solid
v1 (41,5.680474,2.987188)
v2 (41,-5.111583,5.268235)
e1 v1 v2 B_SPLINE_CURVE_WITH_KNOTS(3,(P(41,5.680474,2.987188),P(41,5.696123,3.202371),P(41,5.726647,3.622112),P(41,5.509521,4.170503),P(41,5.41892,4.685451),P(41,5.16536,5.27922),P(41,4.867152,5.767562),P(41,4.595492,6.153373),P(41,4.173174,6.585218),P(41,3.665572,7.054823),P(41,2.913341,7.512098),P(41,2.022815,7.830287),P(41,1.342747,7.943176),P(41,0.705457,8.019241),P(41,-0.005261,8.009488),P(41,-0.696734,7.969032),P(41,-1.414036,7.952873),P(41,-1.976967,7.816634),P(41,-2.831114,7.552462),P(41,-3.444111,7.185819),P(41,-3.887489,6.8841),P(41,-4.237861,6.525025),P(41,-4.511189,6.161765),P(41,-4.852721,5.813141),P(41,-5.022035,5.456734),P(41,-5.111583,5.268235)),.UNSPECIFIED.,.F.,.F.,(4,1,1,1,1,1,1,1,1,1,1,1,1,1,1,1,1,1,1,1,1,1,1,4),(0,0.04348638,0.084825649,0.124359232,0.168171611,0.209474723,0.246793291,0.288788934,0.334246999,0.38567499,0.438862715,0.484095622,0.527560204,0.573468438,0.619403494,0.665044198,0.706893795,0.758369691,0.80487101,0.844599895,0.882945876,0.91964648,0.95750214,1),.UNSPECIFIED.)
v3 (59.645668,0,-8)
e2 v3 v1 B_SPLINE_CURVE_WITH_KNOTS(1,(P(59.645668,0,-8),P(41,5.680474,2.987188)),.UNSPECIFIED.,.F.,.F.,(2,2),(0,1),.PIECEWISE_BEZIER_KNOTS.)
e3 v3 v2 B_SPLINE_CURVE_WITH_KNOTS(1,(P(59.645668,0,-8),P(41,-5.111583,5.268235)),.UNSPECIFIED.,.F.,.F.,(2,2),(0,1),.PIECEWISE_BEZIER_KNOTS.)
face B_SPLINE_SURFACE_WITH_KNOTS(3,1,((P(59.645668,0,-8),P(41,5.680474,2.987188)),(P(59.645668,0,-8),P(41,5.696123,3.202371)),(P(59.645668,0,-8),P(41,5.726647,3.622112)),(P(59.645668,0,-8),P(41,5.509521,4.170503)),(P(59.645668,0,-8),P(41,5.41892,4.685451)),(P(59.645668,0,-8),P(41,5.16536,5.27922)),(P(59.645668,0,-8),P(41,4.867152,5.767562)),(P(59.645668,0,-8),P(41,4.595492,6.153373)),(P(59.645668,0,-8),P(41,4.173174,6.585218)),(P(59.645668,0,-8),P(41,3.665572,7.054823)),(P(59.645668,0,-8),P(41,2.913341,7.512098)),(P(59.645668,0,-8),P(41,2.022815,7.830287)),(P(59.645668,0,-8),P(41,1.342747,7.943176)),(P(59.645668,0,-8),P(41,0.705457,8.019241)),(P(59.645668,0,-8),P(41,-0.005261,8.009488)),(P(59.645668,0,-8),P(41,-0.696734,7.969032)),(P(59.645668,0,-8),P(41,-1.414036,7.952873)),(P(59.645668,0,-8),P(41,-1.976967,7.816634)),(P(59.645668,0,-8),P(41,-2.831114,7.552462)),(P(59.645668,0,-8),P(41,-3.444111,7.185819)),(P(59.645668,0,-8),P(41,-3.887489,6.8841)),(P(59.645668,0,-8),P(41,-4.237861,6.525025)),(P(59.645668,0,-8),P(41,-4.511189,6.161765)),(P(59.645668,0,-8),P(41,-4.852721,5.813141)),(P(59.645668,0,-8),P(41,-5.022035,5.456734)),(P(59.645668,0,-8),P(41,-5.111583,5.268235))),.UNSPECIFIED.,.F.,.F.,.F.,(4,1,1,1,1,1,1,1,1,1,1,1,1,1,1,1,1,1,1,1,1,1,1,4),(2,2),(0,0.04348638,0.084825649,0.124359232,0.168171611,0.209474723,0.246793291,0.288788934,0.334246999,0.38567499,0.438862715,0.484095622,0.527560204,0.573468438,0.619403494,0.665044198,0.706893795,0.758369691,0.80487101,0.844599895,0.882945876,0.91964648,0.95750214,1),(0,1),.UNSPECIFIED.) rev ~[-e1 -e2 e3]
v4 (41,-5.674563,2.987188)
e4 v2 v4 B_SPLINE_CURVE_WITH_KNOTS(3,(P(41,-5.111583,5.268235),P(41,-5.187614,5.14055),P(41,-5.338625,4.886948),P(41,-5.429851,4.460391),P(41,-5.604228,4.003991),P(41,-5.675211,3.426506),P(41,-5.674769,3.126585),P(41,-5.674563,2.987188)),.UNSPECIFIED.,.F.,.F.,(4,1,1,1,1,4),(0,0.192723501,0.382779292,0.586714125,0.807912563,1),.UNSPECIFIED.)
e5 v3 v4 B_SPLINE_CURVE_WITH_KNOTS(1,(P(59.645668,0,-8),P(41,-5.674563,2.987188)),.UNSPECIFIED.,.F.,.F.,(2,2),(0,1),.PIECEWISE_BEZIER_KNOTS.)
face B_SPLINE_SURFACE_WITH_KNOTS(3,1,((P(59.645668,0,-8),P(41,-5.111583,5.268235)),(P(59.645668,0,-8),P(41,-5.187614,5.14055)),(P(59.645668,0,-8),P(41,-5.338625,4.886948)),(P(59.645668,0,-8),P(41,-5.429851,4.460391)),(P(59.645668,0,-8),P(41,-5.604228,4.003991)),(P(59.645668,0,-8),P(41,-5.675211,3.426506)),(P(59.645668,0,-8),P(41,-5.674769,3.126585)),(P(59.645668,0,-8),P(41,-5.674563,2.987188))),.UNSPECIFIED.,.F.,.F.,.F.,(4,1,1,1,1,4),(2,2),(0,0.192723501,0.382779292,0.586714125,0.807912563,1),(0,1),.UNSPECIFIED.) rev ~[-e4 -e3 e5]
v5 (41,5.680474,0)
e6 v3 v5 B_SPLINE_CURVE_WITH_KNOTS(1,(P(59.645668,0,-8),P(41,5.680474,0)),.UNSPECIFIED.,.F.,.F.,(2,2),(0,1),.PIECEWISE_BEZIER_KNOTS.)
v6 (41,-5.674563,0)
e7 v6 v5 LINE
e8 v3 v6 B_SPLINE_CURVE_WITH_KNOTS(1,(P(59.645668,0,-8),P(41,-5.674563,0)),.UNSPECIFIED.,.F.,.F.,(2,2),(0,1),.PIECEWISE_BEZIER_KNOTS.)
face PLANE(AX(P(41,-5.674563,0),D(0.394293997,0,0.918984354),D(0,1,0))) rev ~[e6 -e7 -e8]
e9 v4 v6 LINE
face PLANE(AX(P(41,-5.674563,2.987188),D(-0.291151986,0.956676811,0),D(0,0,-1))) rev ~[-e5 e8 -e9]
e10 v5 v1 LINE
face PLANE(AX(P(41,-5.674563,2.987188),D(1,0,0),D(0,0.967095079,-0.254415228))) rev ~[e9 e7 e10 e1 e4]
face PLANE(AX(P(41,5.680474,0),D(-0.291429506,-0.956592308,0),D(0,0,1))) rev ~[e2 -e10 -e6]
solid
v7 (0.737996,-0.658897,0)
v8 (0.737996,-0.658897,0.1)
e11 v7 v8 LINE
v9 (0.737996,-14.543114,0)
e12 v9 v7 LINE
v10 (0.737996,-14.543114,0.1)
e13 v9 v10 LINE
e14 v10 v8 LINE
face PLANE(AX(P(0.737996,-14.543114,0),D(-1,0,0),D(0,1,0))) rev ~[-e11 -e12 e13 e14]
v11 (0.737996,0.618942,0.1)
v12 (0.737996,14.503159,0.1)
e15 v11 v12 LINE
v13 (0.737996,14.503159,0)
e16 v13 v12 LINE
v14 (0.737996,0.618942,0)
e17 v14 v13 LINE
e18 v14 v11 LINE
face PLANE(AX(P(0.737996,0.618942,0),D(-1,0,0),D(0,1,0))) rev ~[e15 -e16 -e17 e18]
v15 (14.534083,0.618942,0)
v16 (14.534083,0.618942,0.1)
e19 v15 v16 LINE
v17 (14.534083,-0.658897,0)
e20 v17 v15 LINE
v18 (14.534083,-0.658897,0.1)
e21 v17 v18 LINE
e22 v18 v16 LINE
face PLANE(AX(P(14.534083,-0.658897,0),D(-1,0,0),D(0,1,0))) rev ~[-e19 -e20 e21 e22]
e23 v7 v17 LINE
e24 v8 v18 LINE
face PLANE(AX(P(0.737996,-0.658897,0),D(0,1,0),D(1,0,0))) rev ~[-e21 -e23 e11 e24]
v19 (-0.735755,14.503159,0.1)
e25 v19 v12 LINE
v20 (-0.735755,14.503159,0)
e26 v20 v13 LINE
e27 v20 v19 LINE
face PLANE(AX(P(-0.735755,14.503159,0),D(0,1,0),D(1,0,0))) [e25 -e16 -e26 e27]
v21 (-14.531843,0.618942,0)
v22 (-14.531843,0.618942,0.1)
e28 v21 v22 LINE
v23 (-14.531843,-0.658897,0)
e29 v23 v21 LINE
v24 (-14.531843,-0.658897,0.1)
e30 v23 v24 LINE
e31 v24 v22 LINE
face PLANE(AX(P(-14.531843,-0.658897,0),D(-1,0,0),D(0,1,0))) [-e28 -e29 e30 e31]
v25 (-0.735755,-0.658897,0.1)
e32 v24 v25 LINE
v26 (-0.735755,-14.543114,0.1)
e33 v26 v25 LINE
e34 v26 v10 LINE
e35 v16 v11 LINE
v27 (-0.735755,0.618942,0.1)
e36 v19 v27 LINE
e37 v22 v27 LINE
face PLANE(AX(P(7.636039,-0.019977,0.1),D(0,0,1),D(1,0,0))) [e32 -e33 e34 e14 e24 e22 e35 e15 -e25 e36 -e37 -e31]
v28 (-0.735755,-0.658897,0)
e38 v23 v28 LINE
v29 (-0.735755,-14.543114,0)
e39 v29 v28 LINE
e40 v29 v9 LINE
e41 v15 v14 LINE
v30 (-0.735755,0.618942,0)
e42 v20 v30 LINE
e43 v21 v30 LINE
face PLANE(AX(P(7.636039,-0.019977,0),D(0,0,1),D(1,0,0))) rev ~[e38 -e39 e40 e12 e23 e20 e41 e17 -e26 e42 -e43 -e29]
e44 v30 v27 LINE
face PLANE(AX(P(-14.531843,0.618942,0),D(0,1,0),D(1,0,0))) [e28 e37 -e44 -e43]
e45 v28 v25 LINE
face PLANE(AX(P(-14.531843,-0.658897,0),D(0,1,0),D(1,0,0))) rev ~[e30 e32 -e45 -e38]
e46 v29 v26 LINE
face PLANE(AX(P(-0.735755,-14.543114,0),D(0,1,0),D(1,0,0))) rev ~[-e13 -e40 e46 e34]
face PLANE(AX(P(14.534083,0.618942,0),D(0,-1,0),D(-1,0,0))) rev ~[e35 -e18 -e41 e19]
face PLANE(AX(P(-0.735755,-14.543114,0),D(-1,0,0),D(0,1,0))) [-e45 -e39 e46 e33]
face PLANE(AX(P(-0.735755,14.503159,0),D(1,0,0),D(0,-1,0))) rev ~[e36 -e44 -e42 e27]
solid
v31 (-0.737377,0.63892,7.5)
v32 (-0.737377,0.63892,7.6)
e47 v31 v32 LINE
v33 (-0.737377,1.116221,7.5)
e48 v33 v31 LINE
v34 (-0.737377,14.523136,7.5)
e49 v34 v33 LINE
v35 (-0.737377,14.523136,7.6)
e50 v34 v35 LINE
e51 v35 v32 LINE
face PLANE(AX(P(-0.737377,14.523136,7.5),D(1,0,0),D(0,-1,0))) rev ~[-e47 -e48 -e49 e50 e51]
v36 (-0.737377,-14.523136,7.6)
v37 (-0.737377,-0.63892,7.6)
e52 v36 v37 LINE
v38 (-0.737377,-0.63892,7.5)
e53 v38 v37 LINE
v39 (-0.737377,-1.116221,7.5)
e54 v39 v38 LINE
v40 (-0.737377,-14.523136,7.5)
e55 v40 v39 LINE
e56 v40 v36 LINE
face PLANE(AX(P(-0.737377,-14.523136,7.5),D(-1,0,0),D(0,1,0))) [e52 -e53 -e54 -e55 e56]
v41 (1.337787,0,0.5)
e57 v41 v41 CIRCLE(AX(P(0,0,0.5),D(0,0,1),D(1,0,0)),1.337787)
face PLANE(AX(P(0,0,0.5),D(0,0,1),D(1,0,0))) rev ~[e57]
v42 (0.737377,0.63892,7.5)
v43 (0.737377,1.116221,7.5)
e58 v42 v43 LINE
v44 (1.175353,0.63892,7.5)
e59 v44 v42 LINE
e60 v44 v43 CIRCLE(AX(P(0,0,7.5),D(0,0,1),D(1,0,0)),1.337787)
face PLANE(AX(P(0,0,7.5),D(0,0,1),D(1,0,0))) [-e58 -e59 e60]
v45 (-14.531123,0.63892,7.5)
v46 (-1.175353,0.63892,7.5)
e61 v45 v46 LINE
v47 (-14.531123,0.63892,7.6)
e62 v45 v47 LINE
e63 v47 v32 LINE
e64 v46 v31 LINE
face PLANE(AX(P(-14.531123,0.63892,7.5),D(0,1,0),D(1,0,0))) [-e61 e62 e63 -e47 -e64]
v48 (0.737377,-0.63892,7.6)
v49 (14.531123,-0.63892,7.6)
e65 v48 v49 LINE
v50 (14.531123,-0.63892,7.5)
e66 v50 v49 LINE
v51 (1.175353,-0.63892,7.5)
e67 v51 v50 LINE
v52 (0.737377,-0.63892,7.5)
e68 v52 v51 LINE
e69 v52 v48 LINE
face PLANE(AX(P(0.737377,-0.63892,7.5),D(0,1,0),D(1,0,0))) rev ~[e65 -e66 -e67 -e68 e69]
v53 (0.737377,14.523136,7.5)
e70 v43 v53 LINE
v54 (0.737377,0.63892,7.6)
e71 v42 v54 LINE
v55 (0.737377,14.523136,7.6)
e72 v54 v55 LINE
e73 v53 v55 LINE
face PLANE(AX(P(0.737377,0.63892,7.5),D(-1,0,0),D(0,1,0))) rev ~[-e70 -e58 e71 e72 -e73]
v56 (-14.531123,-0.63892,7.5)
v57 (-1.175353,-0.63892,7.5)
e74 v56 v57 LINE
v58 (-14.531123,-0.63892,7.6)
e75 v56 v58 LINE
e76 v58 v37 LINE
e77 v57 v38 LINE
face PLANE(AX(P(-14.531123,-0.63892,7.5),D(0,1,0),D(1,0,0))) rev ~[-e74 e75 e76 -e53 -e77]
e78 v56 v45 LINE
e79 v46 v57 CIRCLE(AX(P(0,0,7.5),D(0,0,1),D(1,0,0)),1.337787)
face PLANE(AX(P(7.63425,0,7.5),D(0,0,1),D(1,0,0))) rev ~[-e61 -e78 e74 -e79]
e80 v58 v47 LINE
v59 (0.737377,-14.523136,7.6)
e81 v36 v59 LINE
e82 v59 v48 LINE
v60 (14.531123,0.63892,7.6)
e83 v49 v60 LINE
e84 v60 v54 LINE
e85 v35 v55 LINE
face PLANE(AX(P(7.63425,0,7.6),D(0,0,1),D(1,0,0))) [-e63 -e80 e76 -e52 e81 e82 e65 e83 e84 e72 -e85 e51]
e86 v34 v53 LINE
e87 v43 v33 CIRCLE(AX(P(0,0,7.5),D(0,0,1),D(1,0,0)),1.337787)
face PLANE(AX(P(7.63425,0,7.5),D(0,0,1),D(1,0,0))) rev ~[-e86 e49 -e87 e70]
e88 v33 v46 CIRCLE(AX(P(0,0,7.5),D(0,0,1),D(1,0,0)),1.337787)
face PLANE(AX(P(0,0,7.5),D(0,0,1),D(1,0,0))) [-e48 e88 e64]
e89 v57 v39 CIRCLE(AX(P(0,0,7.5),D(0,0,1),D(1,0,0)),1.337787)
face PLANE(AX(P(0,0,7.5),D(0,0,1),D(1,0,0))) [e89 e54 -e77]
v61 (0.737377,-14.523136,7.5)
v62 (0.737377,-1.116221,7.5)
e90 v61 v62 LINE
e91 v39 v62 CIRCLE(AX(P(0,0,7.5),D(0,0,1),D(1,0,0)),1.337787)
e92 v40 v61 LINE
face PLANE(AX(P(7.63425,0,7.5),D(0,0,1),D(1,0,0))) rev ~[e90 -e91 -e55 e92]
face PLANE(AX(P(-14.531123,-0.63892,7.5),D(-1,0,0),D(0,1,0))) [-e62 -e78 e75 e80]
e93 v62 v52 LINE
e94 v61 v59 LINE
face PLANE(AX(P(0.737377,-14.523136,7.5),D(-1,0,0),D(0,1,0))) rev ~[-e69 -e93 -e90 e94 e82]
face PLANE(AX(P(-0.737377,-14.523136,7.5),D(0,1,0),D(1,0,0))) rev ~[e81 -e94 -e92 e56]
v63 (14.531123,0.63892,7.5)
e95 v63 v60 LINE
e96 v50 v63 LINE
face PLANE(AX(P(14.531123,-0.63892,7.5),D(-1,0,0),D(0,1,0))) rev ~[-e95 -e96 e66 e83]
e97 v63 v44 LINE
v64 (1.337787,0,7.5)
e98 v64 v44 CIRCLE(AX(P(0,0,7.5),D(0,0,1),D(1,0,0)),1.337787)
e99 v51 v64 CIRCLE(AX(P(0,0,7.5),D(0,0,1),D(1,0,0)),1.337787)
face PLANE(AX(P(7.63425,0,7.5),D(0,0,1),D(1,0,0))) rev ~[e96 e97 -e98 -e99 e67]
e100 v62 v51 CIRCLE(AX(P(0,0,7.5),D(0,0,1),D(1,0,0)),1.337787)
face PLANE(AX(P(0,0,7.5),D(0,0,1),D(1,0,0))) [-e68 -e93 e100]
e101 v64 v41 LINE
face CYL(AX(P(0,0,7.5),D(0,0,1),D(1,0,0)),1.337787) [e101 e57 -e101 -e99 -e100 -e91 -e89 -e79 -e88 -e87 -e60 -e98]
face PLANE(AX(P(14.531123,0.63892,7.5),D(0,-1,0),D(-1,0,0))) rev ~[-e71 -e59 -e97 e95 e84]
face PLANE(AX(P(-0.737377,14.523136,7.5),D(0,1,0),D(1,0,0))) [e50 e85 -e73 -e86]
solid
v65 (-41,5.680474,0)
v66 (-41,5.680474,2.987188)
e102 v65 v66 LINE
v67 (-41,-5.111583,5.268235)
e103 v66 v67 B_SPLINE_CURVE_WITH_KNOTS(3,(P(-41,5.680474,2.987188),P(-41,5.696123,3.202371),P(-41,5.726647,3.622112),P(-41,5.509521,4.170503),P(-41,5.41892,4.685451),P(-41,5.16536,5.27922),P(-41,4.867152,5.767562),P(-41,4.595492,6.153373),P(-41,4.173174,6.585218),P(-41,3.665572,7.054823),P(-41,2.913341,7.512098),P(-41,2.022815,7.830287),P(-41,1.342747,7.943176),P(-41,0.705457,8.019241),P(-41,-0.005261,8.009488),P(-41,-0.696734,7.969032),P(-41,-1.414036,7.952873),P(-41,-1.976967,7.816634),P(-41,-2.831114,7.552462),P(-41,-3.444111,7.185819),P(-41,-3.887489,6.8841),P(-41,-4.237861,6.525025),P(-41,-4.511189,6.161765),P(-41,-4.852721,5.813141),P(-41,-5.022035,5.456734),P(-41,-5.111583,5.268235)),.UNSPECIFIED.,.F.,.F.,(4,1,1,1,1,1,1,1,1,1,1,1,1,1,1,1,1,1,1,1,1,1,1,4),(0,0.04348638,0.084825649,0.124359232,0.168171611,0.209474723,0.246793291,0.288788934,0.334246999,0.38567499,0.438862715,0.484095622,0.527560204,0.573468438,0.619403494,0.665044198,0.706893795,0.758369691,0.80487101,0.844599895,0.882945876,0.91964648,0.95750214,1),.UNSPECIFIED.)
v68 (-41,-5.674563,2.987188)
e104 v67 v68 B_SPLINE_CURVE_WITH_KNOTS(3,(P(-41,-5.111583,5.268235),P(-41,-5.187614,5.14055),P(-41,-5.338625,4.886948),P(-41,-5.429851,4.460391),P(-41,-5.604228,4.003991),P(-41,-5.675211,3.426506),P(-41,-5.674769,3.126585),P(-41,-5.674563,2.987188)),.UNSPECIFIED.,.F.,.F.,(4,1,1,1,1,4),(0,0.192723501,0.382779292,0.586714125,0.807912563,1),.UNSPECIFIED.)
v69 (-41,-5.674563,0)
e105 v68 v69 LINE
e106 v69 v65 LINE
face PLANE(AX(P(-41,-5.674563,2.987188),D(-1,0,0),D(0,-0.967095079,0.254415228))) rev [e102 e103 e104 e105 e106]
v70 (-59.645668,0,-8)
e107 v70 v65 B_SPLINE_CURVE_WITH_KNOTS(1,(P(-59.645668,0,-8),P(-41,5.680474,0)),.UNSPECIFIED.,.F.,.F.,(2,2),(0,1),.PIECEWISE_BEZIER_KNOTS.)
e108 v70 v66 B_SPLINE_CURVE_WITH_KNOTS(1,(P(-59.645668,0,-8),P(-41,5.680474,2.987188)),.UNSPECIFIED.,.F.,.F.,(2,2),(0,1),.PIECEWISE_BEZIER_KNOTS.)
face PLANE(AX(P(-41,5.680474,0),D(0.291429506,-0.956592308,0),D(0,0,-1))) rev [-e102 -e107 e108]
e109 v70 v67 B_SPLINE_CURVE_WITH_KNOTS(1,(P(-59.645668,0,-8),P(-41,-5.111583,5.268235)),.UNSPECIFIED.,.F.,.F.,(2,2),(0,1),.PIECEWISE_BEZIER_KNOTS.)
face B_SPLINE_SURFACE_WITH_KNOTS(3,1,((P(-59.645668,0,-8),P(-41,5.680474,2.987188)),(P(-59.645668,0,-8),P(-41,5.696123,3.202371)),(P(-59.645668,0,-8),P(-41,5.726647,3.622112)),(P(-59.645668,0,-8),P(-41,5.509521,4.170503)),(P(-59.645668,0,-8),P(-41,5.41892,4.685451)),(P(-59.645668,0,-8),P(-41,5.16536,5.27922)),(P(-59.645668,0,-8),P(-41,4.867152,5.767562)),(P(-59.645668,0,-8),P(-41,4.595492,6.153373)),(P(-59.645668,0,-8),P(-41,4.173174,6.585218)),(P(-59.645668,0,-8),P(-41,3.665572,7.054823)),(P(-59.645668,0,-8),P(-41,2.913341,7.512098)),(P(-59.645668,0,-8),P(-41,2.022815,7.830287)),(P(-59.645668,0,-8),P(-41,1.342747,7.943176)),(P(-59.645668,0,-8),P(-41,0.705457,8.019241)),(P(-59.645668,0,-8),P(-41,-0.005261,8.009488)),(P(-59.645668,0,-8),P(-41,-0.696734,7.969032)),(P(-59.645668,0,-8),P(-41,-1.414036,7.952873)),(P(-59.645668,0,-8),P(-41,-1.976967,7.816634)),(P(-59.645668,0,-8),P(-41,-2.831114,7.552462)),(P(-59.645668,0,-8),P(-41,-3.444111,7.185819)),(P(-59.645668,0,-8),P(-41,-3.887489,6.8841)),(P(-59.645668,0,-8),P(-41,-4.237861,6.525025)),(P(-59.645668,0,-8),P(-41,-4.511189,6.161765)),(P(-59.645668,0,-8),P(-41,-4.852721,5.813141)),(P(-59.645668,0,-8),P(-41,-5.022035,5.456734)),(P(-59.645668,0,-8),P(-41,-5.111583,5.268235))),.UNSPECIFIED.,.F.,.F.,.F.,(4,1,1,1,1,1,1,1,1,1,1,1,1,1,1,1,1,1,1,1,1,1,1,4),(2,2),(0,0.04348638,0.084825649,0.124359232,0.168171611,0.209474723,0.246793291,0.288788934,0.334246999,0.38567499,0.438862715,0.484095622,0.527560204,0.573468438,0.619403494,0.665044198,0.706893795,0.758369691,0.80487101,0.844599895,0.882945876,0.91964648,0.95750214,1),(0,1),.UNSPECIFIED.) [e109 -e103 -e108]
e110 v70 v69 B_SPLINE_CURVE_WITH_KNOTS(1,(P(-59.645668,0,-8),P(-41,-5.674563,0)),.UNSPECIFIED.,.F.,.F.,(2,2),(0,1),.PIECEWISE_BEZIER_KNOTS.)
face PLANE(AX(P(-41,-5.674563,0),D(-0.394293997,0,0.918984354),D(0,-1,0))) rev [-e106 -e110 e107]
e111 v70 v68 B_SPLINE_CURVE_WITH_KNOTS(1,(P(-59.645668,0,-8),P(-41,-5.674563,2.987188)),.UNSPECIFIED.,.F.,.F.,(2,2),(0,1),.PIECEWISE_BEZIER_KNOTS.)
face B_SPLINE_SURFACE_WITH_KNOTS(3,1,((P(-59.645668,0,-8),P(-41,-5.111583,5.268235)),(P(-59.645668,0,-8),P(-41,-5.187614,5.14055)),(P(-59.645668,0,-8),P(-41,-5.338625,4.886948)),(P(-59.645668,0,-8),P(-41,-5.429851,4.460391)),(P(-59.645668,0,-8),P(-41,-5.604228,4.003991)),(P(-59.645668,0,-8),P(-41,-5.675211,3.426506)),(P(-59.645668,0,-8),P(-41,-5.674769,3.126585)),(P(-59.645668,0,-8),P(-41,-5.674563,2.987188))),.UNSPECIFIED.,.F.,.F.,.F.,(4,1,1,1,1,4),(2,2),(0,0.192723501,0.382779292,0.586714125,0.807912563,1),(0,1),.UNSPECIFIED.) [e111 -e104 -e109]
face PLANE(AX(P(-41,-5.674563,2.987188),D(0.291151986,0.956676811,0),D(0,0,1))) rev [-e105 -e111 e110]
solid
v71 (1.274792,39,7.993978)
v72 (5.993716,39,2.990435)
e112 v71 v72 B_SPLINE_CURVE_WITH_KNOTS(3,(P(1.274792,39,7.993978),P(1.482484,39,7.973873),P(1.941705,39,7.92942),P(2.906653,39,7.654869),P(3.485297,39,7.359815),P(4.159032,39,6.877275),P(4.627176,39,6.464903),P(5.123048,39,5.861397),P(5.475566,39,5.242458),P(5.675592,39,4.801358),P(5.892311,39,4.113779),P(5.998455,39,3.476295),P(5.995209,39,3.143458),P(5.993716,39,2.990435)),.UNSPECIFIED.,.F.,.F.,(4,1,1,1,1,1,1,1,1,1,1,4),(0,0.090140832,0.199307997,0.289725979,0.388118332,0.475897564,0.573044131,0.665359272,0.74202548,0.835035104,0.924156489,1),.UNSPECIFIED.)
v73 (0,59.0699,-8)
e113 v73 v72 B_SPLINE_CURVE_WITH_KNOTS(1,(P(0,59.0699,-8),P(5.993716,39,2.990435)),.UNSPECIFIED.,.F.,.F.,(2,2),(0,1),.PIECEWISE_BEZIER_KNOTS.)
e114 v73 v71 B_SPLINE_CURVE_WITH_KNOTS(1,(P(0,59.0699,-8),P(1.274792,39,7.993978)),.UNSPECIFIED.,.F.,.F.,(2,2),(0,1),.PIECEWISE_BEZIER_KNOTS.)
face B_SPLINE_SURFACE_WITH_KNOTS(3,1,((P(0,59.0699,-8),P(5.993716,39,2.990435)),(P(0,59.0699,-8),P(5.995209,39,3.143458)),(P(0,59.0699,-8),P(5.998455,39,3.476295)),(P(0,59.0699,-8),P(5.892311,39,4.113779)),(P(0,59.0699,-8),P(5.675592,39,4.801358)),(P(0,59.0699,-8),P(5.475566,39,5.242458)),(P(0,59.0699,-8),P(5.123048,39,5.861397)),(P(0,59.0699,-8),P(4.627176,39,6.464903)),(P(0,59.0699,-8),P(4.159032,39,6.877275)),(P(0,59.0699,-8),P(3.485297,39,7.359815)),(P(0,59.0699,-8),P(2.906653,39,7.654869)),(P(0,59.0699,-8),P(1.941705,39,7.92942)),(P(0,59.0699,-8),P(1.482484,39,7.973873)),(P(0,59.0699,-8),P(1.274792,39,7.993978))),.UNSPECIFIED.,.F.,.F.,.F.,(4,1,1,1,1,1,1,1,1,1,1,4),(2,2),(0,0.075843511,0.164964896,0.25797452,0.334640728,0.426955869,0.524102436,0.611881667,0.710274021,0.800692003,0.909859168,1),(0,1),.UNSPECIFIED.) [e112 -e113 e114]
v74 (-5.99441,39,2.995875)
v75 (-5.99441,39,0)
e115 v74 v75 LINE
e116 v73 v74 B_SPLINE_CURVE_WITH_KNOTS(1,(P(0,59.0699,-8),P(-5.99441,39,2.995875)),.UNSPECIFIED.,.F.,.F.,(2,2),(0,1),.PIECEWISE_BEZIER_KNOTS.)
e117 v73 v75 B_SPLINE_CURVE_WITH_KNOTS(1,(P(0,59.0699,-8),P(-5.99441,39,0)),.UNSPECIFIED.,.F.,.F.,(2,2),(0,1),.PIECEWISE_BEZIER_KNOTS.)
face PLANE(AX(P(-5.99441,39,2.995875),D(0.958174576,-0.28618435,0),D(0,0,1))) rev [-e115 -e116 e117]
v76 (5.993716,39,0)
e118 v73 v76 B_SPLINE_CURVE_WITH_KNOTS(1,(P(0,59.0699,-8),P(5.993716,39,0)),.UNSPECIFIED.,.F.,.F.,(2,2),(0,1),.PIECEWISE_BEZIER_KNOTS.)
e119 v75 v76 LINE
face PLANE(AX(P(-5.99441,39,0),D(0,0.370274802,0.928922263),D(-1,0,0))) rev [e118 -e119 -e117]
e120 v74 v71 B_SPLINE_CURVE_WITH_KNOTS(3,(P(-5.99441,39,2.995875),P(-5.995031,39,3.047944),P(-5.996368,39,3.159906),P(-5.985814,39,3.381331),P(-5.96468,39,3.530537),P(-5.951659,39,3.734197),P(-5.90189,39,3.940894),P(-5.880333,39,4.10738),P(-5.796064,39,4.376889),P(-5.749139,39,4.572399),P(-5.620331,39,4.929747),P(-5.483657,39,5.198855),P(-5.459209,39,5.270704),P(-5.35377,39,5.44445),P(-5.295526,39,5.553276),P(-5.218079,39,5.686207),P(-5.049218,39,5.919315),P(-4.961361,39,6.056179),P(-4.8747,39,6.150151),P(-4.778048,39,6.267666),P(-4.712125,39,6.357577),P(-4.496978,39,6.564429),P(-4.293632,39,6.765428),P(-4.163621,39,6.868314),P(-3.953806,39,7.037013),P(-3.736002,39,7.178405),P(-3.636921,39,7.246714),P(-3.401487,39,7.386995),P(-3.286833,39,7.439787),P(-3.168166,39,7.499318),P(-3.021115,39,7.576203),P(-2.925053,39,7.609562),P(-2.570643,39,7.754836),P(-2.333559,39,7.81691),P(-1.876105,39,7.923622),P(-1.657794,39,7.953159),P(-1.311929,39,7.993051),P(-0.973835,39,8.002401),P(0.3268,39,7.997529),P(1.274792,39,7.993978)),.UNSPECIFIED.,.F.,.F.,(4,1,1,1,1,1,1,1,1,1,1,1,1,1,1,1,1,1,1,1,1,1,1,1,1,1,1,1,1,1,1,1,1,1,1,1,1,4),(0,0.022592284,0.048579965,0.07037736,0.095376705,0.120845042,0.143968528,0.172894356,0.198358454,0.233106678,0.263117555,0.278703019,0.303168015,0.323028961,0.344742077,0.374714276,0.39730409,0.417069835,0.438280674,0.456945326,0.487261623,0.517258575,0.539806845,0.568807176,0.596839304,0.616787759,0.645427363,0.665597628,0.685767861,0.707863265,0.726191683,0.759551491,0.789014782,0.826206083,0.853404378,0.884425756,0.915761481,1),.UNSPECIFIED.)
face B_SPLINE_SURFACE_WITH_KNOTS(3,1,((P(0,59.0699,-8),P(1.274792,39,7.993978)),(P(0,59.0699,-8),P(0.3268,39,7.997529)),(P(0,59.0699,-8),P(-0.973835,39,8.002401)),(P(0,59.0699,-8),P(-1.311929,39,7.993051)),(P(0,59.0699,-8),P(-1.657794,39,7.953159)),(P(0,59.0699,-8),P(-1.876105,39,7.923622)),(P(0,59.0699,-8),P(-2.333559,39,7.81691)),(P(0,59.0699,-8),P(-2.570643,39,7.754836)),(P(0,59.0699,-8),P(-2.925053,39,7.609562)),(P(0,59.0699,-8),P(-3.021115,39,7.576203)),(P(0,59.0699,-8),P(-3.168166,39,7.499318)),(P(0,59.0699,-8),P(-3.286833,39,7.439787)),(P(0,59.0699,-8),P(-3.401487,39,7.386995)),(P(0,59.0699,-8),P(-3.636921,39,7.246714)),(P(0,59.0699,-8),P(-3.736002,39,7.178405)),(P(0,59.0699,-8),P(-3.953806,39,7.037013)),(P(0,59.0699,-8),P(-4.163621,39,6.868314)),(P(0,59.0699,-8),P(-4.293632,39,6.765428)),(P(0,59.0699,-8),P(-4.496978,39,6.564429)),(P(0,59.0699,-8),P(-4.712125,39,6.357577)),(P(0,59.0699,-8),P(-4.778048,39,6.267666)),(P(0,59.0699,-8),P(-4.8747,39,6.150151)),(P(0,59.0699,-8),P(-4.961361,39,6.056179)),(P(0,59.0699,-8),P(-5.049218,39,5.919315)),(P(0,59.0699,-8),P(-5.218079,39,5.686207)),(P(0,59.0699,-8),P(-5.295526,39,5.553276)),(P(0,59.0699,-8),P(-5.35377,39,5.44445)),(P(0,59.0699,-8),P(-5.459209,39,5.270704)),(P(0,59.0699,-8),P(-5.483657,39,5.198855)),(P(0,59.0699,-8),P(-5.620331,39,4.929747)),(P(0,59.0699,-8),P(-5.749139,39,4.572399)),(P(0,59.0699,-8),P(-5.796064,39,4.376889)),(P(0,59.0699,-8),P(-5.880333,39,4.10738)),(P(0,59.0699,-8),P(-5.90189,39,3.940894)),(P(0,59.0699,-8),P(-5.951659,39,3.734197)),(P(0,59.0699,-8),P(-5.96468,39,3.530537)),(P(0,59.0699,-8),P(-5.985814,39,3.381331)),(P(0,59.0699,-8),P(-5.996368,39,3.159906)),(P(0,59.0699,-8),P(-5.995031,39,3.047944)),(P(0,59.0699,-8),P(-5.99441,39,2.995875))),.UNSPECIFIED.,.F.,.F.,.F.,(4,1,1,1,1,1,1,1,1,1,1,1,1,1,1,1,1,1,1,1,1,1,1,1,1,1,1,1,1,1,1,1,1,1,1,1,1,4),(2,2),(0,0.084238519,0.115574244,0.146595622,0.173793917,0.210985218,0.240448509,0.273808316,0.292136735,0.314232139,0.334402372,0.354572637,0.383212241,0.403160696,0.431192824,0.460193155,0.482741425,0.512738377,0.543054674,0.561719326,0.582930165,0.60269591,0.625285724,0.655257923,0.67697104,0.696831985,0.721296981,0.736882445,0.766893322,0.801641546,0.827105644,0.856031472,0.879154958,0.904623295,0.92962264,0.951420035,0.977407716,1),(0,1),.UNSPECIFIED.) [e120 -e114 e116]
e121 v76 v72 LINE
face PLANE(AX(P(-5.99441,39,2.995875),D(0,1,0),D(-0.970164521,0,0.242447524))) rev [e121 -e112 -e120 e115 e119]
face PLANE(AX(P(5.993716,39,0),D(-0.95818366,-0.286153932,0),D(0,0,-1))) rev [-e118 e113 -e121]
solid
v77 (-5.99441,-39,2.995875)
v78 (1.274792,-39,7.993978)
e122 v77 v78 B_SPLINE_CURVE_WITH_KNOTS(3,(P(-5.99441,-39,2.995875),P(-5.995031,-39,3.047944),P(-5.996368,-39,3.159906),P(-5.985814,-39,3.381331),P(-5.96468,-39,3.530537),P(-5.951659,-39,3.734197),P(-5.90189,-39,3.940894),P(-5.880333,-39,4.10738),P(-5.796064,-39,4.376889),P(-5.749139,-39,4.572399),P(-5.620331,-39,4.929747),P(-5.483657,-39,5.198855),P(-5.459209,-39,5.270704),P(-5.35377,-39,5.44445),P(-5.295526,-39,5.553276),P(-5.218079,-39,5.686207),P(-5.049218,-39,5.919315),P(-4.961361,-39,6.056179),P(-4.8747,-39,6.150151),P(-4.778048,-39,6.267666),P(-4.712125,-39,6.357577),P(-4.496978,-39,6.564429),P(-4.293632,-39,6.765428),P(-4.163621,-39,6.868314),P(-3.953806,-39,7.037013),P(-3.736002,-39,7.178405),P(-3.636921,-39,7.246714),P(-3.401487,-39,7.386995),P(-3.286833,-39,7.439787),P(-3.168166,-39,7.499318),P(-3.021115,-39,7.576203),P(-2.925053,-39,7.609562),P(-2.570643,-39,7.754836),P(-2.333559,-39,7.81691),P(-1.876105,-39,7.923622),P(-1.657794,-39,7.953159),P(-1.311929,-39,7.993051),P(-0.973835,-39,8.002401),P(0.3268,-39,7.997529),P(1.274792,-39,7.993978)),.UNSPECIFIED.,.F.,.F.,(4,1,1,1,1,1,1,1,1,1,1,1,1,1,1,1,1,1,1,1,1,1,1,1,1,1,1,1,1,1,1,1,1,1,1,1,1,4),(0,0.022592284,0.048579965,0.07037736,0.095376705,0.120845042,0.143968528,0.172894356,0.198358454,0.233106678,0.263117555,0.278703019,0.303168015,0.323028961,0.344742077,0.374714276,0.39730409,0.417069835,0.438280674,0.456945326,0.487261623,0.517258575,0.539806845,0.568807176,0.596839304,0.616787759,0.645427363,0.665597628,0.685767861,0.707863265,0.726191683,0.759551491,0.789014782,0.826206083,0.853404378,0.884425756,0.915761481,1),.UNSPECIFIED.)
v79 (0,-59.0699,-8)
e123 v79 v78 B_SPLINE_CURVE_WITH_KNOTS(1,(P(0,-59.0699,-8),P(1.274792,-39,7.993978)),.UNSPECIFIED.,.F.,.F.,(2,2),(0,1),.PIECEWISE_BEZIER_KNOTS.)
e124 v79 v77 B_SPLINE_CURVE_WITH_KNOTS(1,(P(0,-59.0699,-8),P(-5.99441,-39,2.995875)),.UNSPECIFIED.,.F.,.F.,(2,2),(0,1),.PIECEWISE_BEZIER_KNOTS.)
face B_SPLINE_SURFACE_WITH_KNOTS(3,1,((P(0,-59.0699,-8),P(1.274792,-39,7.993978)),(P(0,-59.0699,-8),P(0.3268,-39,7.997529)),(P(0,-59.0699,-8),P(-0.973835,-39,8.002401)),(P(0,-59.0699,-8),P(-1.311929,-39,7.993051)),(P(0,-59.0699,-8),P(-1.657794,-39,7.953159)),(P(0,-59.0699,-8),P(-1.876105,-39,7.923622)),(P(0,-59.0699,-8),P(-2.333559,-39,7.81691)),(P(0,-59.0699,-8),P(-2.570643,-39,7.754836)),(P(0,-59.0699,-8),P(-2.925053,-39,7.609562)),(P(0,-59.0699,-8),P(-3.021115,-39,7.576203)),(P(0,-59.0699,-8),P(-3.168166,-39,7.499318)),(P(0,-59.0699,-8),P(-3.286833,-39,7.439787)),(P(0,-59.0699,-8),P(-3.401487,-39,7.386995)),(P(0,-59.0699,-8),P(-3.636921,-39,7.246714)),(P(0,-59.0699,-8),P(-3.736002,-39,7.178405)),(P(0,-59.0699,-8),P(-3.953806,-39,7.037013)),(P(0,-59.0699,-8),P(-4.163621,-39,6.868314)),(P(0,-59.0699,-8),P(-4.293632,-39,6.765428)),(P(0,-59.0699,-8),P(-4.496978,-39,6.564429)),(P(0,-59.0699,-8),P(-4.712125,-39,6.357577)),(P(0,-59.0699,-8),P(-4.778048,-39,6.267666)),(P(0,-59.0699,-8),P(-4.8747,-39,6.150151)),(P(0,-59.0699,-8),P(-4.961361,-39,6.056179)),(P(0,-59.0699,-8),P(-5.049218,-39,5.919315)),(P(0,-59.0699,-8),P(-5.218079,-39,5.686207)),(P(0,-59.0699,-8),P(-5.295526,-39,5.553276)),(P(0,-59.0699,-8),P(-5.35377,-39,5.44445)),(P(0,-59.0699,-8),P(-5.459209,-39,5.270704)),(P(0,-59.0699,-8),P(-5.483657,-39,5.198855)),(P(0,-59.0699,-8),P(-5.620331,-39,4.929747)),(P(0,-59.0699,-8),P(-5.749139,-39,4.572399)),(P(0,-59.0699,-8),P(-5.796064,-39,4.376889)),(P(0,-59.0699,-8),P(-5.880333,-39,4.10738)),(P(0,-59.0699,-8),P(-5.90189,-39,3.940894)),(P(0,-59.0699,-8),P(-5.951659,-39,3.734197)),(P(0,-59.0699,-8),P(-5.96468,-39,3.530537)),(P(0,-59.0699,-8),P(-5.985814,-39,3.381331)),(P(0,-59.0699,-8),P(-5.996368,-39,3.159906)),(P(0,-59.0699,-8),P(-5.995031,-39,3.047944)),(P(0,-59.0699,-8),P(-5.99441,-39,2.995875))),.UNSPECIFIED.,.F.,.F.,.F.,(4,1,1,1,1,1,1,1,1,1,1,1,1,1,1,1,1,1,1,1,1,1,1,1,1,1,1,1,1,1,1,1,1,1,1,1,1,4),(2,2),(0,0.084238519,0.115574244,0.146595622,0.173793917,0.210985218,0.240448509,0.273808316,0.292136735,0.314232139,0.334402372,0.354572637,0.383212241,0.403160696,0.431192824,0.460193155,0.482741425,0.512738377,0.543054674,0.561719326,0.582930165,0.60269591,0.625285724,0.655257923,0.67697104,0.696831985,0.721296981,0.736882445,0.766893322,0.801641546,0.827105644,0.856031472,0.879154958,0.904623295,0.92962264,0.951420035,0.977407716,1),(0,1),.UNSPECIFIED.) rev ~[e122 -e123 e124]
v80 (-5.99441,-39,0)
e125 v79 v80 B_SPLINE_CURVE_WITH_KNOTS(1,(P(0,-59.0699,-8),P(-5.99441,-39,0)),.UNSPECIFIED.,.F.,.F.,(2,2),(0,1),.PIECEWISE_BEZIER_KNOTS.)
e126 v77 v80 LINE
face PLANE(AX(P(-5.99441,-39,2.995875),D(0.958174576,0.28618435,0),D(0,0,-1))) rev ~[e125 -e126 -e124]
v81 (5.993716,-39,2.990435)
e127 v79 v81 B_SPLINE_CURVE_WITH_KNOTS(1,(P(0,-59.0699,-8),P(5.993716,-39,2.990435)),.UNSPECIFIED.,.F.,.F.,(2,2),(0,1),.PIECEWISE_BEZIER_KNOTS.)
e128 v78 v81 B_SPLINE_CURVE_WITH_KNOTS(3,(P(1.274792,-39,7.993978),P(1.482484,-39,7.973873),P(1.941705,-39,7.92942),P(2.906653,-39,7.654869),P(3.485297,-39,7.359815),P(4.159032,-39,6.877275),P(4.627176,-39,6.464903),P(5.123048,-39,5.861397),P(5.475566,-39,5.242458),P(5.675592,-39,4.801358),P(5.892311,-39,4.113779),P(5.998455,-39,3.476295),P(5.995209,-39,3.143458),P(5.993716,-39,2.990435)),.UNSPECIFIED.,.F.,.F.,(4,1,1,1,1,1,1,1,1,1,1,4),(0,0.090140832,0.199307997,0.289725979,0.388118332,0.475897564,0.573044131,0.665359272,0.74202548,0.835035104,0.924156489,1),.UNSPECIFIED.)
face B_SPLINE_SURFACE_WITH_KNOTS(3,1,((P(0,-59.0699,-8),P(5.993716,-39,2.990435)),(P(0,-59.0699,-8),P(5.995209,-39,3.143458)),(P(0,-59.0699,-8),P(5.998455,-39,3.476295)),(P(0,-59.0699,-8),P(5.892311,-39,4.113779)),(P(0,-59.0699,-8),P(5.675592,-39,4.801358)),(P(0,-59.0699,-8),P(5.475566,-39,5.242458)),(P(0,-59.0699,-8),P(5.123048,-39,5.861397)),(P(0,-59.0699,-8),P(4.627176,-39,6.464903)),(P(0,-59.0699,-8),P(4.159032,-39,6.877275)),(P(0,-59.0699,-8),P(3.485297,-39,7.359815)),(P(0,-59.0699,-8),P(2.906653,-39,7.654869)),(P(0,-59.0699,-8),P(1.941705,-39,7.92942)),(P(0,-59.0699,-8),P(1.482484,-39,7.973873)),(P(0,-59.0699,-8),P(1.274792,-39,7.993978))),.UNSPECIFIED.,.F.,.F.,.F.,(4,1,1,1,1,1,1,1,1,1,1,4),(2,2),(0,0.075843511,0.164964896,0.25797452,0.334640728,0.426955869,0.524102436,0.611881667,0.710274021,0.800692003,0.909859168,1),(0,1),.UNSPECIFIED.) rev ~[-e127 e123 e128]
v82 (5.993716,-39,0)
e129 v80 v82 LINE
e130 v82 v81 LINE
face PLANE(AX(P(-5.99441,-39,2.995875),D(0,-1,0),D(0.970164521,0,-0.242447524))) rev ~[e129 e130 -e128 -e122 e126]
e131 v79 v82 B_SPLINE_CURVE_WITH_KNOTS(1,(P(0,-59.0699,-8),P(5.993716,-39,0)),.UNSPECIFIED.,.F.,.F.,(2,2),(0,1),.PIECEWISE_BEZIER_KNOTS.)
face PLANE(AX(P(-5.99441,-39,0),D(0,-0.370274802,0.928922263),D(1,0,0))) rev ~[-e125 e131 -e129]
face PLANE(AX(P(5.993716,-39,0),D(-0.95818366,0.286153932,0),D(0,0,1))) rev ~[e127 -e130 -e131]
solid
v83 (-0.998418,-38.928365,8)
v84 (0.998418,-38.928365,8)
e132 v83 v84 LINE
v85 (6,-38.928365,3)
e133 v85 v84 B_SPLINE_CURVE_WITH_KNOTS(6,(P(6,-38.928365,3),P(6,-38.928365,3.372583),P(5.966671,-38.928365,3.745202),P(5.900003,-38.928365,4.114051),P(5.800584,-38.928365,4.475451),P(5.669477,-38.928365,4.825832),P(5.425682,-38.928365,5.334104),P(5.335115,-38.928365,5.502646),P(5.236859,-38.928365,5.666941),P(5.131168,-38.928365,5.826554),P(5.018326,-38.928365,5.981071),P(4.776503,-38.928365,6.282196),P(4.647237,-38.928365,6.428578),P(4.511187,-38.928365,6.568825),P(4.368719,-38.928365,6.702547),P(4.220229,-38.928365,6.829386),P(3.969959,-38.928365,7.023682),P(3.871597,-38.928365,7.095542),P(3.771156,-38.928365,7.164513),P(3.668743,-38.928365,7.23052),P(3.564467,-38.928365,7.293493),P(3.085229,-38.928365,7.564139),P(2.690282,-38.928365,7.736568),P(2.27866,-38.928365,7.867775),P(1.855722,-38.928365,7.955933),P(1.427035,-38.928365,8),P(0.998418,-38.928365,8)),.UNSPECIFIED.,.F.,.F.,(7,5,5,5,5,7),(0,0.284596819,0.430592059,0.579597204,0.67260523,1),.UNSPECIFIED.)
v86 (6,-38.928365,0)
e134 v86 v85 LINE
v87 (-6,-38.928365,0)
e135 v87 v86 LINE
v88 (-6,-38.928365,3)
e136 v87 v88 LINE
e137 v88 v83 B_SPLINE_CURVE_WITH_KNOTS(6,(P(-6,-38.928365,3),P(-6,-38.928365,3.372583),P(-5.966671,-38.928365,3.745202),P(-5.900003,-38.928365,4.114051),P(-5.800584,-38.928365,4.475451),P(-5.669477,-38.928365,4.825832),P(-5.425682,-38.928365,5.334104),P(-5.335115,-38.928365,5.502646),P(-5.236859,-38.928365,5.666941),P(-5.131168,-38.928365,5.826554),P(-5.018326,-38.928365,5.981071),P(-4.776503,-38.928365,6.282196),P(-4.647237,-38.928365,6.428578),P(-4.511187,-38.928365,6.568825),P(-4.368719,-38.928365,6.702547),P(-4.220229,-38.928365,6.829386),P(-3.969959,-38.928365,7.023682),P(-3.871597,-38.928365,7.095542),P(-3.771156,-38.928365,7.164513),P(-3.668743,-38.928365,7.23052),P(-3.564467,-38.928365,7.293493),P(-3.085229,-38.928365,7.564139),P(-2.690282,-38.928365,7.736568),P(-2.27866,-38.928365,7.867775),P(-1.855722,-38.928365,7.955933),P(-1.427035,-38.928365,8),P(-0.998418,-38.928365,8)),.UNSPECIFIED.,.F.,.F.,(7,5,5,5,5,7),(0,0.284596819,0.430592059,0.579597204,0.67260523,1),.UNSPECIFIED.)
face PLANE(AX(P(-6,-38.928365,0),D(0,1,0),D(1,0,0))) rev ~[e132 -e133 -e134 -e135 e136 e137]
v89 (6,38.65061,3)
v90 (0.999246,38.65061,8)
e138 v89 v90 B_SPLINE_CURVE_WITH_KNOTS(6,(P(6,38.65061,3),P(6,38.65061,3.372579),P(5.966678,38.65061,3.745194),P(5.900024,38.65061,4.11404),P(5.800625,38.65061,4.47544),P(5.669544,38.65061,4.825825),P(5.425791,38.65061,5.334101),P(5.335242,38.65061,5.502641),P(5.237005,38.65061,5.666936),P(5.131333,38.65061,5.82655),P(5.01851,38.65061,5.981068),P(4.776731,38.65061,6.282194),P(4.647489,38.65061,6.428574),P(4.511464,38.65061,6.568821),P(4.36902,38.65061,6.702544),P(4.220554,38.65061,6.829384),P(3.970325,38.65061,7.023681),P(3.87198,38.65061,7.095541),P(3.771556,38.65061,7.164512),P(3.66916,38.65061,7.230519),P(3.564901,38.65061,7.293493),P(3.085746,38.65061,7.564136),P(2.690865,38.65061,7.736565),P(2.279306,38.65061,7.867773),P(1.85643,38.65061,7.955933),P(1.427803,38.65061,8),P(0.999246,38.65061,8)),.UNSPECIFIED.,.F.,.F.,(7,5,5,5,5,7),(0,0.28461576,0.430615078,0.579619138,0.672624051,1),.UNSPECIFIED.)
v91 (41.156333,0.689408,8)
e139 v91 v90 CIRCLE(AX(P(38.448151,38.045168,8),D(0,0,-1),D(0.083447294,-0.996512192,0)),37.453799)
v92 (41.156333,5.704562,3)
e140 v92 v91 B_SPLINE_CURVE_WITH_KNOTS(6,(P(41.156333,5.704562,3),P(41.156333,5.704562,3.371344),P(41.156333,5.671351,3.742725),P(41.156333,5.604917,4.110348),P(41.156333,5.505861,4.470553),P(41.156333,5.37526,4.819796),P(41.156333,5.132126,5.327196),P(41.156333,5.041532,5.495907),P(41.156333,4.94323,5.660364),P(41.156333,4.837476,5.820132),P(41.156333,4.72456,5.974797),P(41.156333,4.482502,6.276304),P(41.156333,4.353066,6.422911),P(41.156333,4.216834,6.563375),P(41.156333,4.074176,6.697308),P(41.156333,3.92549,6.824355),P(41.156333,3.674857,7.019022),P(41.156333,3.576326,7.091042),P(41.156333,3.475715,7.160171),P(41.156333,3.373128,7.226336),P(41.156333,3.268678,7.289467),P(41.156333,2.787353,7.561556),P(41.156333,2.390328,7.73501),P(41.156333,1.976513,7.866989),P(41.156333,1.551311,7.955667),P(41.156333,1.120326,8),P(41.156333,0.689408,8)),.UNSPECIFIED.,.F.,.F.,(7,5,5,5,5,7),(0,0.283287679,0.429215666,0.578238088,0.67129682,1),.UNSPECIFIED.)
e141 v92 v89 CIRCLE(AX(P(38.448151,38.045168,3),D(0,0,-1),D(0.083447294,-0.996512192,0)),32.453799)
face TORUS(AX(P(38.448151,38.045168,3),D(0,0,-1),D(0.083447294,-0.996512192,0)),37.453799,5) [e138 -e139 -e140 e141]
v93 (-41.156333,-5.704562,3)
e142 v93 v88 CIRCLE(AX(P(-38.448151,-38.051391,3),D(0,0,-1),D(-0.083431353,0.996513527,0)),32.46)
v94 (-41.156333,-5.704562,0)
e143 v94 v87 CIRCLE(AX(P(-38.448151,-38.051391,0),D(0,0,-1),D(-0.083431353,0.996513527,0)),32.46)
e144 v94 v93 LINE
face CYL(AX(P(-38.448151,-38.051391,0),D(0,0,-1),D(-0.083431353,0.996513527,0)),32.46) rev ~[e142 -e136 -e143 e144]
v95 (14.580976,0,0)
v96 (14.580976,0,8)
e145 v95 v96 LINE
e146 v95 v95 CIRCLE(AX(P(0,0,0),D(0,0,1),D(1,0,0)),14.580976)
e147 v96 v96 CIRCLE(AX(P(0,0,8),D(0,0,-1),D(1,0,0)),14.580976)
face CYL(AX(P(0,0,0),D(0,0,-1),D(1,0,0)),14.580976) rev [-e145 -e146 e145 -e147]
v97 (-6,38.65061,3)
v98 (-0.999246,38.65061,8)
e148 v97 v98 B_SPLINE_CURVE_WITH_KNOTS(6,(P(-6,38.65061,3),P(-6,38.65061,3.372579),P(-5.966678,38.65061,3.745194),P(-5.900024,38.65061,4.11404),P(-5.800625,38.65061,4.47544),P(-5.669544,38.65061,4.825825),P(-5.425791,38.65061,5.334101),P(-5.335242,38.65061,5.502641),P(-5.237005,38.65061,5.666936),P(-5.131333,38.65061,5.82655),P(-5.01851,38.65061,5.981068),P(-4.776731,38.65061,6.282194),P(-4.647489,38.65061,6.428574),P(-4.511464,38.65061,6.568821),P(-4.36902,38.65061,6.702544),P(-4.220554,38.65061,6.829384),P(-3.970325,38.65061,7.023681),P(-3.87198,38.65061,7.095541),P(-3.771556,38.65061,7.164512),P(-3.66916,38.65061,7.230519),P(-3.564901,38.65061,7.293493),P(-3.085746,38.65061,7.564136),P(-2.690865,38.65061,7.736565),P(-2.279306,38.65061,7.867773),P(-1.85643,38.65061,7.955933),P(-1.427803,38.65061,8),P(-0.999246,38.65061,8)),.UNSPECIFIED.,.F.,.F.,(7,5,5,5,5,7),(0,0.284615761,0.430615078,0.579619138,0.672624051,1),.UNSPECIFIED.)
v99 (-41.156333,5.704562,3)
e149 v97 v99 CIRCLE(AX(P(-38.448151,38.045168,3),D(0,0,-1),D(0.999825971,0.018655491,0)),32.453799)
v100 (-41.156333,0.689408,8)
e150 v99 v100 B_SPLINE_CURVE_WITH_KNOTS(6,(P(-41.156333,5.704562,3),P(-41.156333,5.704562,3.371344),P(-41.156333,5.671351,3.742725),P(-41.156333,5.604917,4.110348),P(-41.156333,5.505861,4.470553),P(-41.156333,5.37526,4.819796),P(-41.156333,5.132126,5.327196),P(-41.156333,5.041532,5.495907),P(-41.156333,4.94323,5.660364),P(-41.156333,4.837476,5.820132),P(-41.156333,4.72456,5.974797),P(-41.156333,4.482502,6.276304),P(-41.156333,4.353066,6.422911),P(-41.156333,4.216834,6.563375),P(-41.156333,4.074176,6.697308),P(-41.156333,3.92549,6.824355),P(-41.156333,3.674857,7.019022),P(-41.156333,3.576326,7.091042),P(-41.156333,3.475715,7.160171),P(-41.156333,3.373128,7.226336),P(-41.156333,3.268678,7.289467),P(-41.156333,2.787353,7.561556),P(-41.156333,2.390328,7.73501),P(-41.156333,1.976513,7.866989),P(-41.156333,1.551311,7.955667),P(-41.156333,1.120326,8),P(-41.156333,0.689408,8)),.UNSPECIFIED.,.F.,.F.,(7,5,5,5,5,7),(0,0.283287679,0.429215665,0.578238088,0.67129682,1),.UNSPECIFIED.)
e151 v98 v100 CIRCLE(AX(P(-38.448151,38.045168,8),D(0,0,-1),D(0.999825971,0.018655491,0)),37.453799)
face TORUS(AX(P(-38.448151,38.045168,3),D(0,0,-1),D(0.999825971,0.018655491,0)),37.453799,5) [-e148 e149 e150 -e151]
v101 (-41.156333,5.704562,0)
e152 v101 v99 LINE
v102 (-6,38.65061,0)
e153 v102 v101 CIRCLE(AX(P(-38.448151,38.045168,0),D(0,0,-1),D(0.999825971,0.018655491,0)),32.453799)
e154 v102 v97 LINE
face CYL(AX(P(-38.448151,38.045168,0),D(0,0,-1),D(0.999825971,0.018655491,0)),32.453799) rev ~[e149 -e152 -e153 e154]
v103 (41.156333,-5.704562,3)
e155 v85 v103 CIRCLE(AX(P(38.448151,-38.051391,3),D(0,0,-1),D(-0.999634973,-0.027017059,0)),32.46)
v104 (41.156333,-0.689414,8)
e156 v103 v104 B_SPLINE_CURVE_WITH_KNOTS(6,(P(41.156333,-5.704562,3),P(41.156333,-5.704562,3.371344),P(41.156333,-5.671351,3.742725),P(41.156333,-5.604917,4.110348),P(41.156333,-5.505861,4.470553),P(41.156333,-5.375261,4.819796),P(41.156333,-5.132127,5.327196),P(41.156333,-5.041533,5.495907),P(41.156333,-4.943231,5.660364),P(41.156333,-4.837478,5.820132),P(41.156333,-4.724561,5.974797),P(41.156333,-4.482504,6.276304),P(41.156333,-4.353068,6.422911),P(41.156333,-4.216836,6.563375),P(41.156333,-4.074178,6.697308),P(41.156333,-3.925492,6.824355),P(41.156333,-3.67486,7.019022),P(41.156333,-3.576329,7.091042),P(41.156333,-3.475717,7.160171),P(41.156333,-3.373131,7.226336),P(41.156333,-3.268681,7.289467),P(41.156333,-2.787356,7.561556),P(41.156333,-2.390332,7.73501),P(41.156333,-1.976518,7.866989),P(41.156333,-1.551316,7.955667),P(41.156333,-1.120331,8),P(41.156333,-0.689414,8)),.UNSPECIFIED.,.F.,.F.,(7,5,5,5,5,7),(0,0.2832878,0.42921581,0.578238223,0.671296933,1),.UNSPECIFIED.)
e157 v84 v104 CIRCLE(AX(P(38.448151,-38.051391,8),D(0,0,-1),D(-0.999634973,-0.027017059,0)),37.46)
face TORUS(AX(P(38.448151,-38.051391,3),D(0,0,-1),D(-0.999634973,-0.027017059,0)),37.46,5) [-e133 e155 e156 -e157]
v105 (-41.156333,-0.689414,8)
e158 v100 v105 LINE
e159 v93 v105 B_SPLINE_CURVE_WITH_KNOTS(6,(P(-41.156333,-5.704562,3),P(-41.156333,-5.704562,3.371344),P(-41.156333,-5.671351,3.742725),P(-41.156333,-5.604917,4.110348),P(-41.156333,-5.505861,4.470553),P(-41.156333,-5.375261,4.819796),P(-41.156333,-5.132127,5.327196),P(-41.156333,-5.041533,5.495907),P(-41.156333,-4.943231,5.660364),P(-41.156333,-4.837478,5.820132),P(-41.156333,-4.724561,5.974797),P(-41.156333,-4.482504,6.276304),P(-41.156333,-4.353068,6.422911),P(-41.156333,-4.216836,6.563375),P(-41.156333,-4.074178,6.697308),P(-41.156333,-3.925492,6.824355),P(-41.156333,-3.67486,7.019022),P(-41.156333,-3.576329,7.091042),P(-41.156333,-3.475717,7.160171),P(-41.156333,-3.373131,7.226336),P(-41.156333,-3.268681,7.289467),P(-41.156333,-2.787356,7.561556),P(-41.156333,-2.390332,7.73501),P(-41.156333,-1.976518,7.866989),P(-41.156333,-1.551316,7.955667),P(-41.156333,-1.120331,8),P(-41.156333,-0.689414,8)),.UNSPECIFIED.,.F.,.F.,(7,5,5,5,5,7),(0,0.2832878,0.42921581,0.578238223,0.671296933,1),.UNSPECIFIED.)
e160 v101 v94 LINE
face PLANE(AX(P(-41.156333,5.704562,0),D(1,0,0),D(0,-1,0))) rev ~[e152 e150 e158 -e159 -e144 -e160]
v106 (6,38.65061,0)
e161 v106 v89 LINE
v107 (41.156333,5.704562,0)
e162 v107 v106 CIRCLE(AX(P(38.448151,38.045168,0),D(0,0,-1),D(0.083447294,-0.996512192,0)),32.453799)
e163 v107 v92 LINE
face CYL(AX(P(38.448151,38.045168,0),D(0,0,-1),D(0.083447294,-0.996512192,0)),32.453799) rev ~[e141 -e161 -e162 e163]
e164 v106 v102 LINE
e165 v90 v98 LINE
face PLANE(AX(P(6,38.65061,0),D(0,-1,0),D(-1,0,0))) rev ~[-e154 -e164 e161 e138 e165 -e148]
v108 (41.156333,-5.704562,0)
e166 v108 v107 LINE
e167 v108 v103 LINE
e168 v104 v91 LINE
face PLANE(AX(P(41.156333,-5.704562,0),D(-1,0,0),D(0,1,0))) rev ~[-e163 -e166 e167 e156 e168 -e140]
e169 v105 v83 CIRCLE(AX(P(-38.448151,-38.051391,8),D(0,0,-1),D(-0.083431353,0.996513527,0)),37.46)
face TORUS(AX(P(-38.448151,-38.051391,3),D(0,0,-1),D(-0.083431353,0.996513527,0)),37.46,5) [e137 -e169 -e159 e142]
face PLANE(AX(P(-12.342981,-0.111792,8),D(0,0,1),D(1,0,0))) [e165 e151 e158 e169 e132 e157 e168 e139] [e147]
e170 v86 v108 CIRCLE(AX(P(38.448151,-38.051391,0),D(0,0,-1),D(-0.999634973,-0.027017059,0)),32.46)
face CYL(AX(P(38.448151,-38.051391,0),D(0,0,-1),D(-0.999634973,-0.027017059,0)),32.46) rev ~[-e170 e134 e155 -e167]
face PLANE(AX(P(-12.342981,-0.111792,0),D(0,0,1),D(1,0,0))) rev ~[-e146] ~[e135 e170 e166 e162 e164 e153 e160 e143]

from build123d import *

# Parameters (mm, degrees)
F1_DEPTH       = 8
F5_R           = 5
F10_R          = 14.5809762942
F11_DEPTH      = 25
F11_DEPTH_BACK = 25
F17_R          = 1.3377868925
F18_DEPTH      = 7
F19_W          = 13.7937454856
F19_H          = 1.2778390591
F19_W_2        = 1.4747540699
F19_H_2        = 13.8842168999
F20_DEPTH      = 0.1
F21_W          = 13.7960873644
F21_H          = 1.2778390591
F21_W_2        = 1.4737510647
F21_H_2        = 13.8842168999
F22_DEPTH      = 0.1


# Not quite as in the source:
# - a feature names something its author has since deleted; it is built from what else it names


with BuildPart() as f1:
    # F0 (on Top) → F1 (new body)
    with BuildSketch(Plane.XY):
        with BuildLine():
            Line((-6, -38.9283647568), (0, -38.9283647568))
            Line((0, -38.9283647568), (0, 38.6506099872))
            Line((0, 38.6506099872), (-6, 38.6506099872))
            ThreePointArc((-6, 38.6506099872), (-16.2563291401, 14.3645411148), (-41.1563329399, 5.7045619305))
            Line((-41.1563329399, 5.7045619305), (-41.1563329399, -5.7045619305))
            ThreePointArc((-41.1563329399, -5.7045619305), (-16.1530460363, -14.4594456673), (-6, -38.9283647568))
        make_face()
        with BuildLine():
            Line((0, 38.6506099872), (0, -38.9283647568))
            Line((0, -38.9283647568), (6, -38.9283647568))
            ThreePointArc((6, -38.9283647568), (16.1530460363, -14.4594456673), (41.1563329399, -5.7045619305))
            Line((41.1563329399, -5.7045619305), (41.1563329399, 5.7045619305))
            ThreePointArc((41.1563329399, 5.7045619305), (16.2563291401, 14.3645411148), (6, 38.6506099872))
            Line((6, 38.6506099872), (0, 38.6506099872))
        make_face()
    extrude(amount=F1_DEPTH)

    # F5
    f5_edges = [f1.edges().sort_by_distance(p)[0] for p in [
        (-16.256329, 14.364541, 8),
        (-16.153046, -14.459446, 8),
        (16.256329, 14.364541, 8),
        (16.153046, -14.459446, 8),
    ]]
    fillet(f5_edges, radius=F5_R)

    # F10 (on Top) → F11 (cut, two sides)
    with BuildSketch(Plane.XY) as f11_sk:
        Circle(F10_R)
    extrude(amount=F11_DEPTH, mode=Mode.SUBTRACT)
    extrude(f11_sk.sketch, amount=-F11_DEPTH_BACK, mode=Mode.SUBTRACT)


with BuildPart() as f7:
    # F6 (on offset) → F7 section 0
    with BuildSketch(Plane.YZ.offset(41), mode=Mode.PRIVATE) as f7_s0:
        with BuildLine():
            Line((-5.6745633483, 2.9871875886), (-5.6745633483, 0))
            Line((-5.6745633483, 0), (5.680473987, 0))
            Line((5.680473987, 0), (5.680473987, 2.9871875886))
            add(Edge.make_bspline(
                [(5.680473987, 2.9871875886), (5.6961226516, 3.2023706582), (5.7266473384, 3.6221122778), (5.5095213329, 4.1705030453), (5.4189197792, 4.6854509336), (5.1653598653, 5.2792204603), (4.8671516526, 5.7675621219), (4.595492144, 6.1533733509), (4.1731740718, 6.5852177534), (3.6655723563, 7.0548230975), (2.9133413088, 7.5120975715), (2.0228145415, 7.8302873353), (1.3427473514, 7.9431760952), (0.7054569456, 8.0192411539), (-0.0052608695, 8.0094879795), (-0.6967338383, 7.9690324076), (-1.4140359274, 7.9528726283), (-1.9769670867, 7.8166335645), (-2.831114124, 7.5524617191), (-3.4441109512, 7.1858192873), (-3.8874893713, 6.884099922), (-4.2378609304, 6.5250253974), (-4.5111891113, 6.161764951), (-4.8527214432, 5.8131409825), (-5.022034993, 5.4567339521), (-5.1115825772, 5.2682352252)],
                knots=[0, 0, 0, 0, 0.0434863796, 0.0848256485, 0.1243592318, 0.1681716105, 0.2094747234, 0.2467932906, 0.2887889342, 0.3342469985, 0.3856749903, 0.4388627149, 0.4840956225, 0.5275602038, 0.5734684376, 0.6194034944, 0.6650441984, 0.7068937948, 0.7583696913, 0.8048710099, 0.8445998947, 0.882945876, 0.9196464802, 0.9575021397, 1, 1, 1, 1], degree=3))
            add(Edge.make_bspline(
                [(-5.1115825772, 5.2682352252), (-5.1876140748, 5.1405504387), (-5.3386246291, 4.8869483001), (-5.4298509883, 4.4603913926), (-5.6042277019, 4.0039908588), (-5.6752105609, 3.4265059116), (-5.6747687115, 3.1265850958), (-5.6745633483, 2.9871875886)],
                knots=[0, 0, 0, 0, 0.1927235014, 0.3827792915, 0.5867141249, 0.8079125632, 1, 1, 1, 1], degree=3))
        make_face()
    loft([Vertex(59.6456676722, 0, -8), f7_s0.sketch])


with BuildPart() as f9_1:
    # F9: instance of F7
    add(f7.part.mirror(Plane.YZ))


with BuildPart() as f15:
    # F13 (on offset) → F15 section 0
    with BuildSketch(Plane.XZ.offset(39), mode=Mode.PRIVATE) as f15_s0:
        with BuildLine():
            Line((-5.9944099137, 2.9958747894), (-5.9944099137, 0))
            Line((-5.9944099137, 0), (5.9937159531, 0))
            Line((5.9937159531, 0), (5.9937159531, 2.9904348776))
            add(Edge.make_bspline(
                [(1.2747923611, 7.9939775169), (1.4824839899, 7.9738728024), (1.9417054276, 7.9294198027), (2.9066530946, 7.6548688525), (3.4852965721, 7.3598152646), (4.1590321718, 6.8772754783), (4.6271761756, 6.4649031497), (5.123048457, 5.8613971166), (5.475565689, 5.2424580454), (5.6755920242, 4.8013575587), (5.892310974, 4.1137787102), (5.9984549521, 3.4762948253), (5.9952085186, 3.1434582903), (5.9937159531, 2.9904348776)],
                knots=[0, 0, 0, 0, 0.0901408322, 0.1993079971, 0.2897259787, 0.3881183325, 0.4758975639, 0.573044131, 0.6653592716, 0.7420254803, 0.835035104, 0.9241564892, 1, 1, 1, 1], degree=3))
            add(Edge.make_bspline(
                [(-5.9944099137, 2.9958747894), (-5.9950314515, 3.0479435495), (-5.9963679382, 3.1599064882), (-5.9858142016, 3.3813314), (-5.9646795578, 3.5305374515), (-5.9516586953, 3.7341965228), (-5.9018897214, 3.9408938339), (-5.8803328007, 4.1073797979), (-5.7960635617, 4.3768885226), (-5.74913918, 4.5723993195), (-5.6203314712, 4.9297471084), (-5.4836570267, 5.1988546444), (-5.4592090914, 5.270703893), (-5.3537695157, 5.4444498536), (-5.295526214, 5.5532759218), (-5.2180785314, 5.6862072163), (-5.0492178435, 5.9193146032), (-4.961360939, 6.0561793869), (-4.8747004771, 6.1501514649), (-4.7780479662, 6.2676655241), (-4.7121245787, 6.3575768778), (-4.4969781008, 6.5644294278), (-4.293631571, 6.7654278403), (-4.1636212216, 6.8683144457), (-3.9538061718, 7.0370130479), (-3.7360017211, 7.1784048192), (-3.6369210607, 7.2467137809), (-3.4014865011, 7.3869954226), (-3.2868331685, 7.4397869865), (-3.1681660923, 7.4993179406), (-3.0211153204, 7.5762029169), (-2.9250525886, 7.6095624185), (-2.5706425561, 7.7548356943), (-2.3335590973, 7.8169101439), (-1.8761051772, 7.923622144), (-1.6577938155, 7.9531586472), (-1.3119293852, 7.993050517), (-0.9738346206, 8.002401008), (0.326799832, 7.9975287536), (1.2747923611, 7.9939775169)],
                knots=[0, 0, 0, 0, 0.0225922841, 0.0485799646, 0.0703773601, 0.0953767047, 0.1208450417, 0.1439685284, 0.1728943558, 0.1983584542, 0.2331066781, 0.2631175547, 0.2787030186, 0.3031680151, 0.3230289605, 0.3447420766, 0.3747142758, 0.39730409, 0.4170698345, 0.4382806743, 0.4569453263, 0.4872616232, 0.5172585751, 0.5398068451, 0.5688071761, 0.5968393041, 0.6167877586, 0.645427363, 0.6655976282, 0.6857678614, 0.7078632653, 0.7261916835, 0.7595514909, 0.7890147822, 0.8262060834, 0.8534043783, 0.8844257561, 0.9157614812, 1, 1, 1, 1], degree=3))
        make_face()
    loft([Vertex(0, -59.0698996127, -8), f15_s0.sketch])


with BuildPart() as f16_1:
    # F16: instance of F15
    add(f15.part.mirror(Plane.XZ))


with BuildPart() as f18:
    # F17 (on offset) → F18 (new body)
    with BuildSketch(Plane.XY.offset(7.5)):
        Circle(F17_R)
    extrude(amount=-F18_DEPTH)

    # F19 (on offset) → F20 (join)
    with BuildSketch(Plane.XY.offset(7.5)):
        with Locations((7.6342497778, 0)):
            Rectangle(F19_W, F19_H)
        Rectangle(F19_W_2, F19_H)
        with Locations((0, 7.5810279795)):
            Rectangle(F19_W_2, F19_H_2)
        with Locations((-7.6342497778, 0)):
            Rectangle(F19_W, F19_H)
        with Locations((0, -7.5810279795)):
            Rectangle(F19_W_2, F19_H_2)
    extrude(amount=F20_DEPTH)


with BuildPart() as f22:
    # F21 (on Top) → F22 (new body)
    with BuildSketch(Plane.XY):
        with Locations((7.6360394938, -0.0199771021)):
            Rectangle(F21_W, F21_H)
        with Locations((0.0011202792, -0.0199771021)):
            Rectangle(F21_W_2, F21_H)
        with Locations((0.0011202792, 7.5610508775)):
            Rectangle(F21_W_2, F21_H_2)
        with Locations((-7.6337989354, -0.0199771021)):
            Rectangle(F21_W, F21_H)
        with Locations((0.0011202792, -7.6010050816)):
            Rectangle(F21_W_2, F21_H_2)
    extrude(amount=F22_DEPTH)


solid = Compound([f1.part, f7.part, f9_1.part, f15.part, f16_1.part, f18.part, f22.part])
